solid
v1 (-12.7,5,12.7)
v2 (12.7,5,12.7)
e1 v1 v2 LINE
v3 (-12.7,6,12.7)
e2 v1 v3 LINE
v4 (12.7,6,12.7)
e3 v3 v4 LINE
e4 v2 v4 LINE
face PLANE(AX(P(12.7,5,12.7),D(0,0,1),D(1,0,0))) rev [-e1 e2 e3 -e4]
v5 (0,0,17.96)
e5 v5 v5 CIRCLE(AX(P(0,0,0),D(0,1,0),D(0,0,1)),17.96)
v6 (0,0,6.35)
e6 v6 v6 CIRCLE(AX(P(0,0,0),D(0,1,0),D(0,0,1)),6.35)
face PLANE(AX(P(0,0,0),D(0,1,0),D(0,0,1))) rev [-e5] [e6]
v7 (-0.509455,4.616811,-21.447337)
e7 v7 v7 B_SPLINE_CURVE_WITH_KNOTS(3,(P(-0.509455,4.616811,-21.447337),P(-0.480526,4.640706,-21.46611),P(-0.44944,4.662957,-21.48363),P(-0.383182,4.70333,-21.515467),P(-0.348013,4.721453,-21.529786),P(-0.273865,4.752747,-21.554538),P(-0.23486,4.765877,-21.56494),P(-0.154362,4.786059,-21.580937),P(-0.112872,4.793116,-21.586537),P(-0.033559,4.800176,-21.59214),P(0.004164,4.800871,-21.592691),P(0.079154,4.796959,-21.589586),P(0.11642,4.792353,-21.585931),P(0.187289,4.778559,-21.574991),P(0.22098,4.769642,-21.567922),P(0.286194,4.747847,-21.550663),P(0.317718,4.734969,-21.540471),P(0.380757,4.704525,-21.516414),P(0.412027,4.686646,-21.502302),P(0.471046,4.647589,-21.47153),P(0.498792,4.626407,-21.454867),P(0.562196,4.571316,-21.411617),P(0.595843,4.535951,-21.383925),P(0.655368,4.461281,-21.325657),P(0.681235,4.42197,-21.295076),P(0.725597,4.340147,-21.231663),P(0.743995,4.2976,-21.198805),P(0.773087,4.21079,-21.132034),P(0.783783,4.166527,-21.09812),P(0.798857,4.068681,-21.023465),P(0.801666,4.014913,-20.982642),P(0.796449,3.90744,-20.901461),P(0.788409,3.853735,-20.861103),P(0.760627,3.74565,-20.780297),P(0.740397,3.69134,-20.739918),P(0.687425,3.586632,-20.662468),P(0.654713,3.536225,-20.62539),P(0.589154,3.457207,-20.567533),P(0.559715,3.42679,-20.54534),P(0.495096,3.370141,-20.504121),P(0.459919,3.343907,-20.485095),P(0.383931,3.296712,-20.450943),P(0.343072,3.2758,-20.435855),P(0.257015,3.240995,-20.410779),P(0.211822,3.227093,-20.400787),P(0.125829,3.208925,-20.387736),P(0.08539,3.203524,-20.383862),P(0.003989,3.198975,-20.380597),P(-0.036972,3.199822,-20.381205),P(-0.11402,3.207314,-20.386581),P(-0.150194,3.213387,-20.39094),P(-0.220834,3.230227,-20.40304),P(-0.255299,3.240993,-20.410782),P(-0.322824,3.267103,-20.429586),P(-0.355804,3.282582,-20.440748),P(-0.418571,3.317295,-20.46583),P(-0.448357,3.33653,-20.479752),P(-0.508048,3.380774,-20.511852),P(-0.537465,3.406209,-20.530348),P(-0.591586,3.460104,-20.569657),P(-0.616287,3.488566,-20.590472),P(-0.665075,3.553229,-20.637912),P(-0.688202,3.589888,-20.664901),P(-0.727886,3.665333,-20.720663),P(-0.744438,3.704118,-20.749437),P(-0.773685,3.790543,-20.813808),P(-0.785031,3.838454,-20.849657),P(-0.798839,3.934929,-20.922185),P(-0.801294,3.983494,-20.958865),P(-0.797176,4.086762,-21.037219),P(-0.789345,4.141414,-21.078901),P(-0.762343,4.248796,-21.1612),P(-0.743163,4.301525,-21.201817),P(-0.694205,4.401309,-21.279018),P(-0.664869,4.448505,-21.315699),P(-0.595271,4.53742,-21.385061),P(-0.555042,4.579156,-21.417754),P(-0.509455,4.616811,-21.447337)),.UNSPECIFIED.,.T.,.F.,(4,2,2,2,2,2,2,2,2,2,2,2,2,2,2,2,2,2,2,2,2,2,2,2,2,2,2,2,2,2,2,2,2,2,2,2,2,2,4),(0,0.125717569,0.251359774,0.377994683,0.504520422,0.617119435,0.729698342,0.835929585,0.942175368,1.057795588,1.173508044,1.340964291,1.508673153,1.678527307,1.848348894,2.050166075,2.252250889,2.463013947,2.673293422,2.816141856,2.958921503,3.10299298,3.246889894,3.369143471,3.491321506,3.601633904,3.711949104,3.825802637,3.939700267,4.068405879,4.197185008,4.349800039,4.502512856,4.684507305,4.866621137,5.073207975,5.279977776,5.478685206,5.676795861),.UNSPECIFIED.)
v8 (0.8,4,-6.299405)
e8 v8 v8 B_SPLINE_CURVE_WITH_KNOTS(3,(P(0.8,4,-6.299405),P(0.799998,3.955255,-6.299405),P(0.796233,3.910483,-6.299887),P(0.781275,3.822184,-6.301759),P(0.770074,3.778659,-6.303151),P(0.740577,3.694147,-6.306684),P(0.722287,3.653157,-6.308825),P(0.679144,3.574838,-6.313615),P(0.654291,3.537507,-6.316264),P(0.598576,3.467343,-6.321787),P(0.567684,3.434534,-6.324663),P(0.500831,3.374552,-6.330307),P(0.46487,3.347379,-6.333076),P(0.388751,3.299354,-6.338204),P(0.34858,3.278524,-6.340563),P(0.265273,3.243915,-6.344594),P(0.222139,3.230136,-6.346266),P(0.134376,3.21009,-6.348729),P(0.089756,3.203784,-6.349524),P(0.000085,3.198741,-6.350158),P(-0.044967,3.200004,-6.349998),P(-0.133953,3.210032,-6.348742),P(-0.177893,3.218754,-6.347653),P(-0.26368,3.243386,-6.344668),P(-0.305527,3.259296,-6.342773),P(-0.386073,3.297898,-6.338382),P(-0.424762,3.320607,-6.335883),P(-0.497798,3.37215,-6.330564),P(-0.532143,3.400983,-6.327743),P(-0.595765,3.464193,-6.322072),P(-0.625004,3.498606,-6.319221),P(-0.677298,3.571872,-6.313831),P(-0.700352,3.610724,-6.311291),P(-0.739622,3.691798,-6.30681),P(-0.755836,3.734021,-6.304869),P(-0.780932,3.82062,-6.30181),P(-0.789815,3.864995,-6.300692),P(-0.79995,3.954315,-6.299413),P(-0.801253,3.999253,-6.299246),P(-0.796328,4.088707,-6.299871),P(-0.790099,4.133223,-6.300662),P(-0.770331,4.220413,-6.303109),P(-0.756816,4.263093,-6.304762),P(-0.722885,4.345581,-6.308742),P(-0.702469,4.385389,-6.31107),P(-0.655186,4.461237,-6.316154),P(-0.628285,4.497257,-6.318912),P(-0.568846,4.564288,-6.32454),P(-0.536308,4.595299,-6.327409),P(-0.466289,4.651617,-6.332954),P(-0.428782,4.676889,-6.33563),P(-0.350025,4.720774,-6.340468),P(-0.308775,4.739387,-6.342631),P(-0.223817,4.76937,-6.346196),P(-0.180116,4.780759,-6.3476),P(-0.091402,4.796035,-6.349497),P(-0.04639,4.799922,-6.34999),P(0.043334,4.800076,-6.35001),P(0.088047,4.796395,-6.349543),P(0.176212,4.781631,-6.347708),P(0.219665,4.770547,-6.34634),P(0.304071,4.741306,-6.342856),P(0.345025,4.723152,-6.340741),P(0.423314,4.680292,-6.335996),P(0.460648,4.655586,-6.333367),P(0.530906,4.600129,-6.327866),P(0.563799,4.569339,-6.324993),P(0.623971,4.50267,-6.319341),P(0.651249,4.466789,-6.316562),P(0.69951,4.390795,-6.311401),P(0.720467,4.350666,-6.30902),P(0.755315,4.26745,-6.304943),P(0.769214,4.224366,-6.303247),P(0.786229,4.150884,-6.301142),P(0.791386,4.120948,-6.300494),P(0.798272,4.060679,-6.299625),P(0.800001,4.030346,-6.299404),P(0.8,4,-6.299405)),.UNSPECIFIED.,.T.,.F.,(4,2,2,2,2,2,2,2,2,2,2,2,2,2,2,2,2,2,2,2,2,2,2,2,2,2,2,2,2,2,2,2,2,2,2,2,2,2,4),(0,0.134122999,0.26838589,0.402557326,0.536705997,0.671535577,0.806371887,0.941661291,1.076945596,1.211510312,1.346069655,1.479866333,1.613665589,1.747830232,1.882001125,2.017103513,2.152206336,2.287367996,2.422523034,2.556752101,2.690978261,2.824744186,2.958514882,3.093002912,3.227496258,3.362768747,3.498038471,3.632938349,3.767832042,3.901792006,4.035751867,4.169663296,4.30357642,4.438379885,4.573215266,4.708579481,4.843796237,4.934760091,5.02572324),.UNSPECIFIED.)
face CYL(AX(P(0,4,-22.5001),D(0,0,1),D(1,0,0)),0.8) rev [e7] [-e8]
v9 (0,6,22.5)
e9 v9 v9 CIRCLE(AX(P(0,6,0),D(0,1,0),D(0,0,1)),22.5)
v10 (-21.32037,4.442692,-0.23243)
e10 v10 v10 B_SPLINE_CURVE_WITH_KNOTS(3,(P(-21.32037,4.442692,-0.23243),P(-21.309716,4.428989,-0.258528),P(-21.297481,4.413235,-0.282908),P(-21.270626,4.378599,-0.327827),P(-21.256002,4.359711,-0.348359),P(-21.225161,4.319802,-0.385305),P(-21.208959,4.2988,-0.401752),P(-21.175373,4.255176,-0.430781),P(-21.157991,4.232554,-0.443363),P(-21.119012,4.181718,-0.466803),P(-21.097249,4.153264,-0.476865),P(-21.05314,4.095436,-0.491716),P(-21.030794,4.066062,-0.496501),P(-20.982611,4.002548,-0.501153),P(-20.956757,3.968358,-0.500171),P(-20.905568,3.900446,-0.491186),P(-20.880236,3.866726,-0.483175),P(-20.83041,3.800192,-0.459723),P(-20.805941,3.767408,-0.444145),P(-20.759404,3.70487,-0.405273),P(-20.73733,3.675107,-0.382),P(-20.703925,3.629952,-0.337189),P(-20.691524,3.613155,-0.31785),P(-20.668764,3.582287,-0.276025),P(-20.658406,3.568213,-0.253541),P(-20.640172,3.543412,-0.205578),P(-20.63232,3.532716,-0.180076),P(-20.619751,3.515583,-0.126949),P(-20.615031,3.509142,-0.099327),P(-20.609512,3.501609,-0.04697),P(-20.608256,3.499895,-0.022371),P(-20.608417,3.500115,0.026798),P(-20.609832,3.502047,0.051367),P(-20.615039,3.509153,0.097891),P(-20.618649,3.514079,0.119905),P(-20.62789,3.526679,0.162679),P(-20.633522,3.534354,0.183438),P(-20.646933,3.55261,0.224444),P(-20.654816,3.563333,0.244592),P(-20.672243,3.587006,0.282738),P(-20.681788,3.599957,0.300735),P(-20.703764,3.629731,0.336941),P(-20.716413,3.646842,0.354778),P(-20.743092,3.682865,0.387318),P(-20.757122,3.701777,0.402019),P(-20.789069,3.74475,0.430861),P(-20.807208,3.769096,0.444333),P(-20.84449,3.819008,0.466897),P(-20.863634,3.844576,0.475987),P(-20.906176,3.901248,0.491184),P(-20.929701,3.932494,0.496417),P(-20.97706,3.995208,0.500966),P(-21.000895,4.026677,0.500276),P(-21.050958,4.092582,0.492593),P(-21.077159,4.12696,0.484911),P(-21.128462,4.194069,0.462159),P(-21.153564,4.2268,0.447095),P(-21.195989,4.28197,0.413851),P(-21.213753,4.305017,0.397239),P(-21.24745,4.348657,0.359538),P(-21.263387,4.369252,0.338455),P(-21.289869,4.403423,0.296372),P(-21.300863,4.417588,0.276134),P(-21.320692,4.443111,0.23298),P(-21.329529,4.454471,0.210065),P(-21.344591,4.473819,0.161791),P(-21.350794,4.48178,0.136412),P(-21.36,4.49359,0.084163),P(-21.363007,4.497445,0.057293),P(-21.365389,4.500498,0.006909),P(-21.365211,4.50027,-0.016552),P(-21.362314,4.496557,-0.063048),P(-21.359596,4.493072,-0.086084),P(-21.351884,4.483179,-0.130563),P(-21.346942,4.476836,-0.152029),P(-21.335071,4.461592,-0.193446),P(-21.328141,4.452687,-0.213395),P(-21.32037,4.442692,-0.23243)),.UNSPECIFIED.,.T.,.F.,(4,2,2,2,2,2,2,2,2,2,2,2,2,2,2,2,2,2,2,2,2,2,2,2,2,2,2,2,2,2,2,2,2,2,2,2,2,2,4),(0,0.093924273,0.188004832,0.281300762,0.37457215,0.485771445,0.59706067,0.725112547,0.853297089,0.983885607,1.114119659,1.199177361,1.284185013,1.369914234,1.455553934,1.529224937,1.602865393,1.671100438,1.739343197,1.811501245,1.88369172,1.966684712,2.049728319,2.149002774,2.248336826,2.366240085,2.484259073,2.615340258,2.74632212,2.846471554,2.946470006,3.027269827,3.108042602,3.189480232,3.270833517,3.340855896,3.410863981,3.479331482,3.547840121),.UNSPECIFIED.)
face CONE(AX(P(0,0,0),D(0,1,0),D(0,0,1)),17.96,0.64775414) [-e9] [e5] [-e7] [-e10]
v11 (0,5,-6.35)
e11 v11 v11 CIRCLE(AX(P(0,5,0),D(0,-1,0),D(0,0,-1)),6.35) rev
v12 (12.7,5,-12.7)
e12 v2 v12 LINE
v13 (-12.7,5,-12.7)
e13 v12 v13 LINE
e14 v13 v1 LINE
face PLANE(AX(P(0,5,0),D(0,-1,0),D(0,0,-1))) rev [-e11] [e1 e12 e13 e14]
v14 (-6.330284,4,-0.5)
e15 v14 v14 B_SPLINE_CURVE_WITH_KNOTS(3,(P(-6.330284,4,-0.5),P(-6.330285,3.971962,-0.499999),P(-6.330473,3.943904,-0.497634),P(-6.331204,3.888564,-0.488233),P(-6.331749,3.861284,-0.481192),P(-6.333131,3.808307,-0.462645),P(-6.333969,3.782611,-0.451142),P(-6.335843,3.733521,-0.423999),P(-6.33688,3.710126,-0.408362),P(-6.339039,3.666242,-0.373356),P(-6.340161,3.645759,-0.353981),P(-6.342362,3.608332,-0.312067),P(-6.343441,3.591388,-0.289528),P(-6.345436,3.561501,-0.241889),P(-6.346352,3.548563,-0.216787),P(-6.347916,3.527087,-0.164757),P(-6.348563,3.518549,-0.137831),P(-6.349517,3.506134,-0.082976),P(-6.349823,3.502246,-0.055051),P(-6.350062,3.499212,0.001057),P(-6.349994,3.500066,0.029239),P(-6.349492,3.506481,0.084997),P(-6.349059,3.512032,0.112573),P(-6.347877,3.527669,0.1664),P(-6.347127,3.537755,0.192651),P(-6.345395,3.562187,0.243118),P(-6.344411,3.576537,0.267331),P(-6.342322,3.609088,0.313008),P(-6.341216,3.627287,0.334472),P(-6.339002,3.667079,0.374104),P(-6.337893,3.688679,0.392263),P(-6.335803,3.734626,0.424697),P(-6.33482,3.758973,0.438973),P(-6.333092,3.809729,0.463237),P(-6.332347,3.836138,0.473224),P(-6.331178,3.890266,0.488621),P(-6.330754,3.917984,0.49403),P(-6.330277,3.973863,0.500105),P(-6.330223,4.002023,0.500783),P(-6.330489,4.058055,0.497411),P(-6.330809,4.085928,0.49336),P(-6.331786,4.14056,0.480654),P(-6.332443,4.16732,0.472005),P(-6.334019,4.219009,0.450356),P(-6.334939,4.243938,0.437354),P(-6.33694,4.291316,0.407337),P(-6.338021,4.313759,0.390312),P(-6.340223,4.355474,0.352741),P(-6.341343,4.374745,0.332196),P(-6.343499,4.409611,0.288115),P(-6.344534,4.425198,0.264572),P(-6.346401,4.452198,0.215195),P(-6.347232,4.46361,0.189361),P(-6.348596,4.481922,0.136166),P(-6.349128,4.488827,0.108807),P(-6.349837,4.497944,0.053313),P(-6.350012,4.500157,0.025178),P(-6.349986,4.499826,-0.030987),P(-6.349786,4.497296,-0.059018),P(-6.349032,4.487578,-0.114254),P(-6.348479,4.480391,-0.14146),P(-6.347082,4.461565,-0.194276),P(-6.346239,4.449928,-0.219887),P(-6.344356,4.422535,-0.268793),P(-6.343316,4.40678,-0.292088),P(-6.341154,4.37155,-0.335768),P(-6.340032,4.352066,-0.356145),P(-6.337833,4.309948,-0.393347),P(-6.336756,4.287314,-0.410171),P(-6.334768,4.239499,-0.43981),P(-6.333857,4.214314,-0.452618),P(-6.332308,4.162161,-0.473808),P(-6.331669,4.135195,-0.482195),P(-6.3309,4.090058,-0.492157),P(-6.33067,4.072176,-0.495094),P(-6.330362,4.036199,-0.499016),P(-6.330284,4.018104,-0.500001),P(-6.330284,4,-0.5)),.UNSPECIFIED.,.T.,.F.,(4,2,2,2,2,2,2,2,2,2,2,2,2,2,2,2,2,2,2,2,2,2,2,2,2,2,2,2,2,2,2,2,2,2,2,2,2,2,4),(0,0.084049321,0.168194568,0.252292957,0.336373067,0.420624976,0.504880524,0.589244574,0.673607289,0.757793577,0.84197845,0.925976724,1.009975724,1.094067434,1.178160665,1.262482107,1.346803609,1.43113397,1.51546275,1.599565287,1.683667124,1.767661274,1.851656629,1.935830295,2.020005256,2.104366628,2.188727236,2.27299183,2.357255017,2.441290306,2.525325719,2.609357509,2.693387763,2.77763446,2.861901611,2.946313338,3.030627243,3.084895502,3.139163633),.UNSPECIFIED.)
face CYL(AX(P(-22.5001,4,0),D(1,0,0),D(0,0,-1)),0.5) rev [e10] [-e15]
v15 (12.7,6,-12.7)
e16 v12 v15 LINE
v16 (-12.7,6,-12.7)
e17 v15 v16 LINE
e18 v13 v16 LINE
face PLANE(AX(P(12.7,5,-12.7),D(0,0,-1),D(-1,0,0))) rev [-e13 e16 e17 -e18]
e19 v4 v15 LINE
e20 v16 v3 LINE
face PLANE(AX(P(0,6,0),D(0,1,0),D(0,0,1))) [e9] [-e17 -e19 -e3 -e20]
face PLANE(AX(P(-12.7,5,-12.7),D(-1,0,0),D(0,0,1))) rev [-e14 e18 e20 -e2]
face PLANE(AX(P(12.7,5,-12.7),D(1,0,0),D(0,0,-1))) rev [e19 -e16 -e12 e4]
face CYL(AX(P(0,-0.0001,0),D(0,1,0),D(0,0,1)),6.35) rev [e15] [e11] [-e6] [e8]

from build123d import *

# Parameters (mm, degrees)
SKETCH5_R          = 6.35
CUT_EXTRUDE1_DEPTH = 33.380549717
SKETCH7_W          = 25.4
SKETCH7_H          = 25.4
CUT_EXTRUDE2_DEPTH = 1
SKETCH8_R          = 0.8
CUT_EXTRUDE3_DEPTH = 33.380549717
SKETCH9_R          = 0.5
CUT_EXTRUDE4_DEPTH = 33.380549875


# Read off the part's stored shape, not the designer's step: Loft1
with BuildPart() as part:
    # Loft1 outline → Loft1 (revolve)
    with BuildSketch(Plane.XY):
        Polygon((0, 0), (17.96, 0), (22.5, 6), (0, 6), align=None)
    revolve(axis=Axis((0, 0, 0), (0, 1, 0)))

    # Sketch5 → Cut-Extrude1 (cut, through all)
    with BuildSketch(Plane(origin=(0, 6, 0), x_dir=(1, 0, 0), z_dir=(0, 1, 0))):
        with Locations(Location((0, 0, 0), (0, 0, 270))):
            Circle(SKETCH5_R)
    extrude(amount=-CUT_EXTRUDE1_DEPTH, mode=Mode.SUBTRACT)

    # Sketch7 → Cut-Extrude2 (cut)
    with BuildSketch(Plane(origin=(0, 6, 0), x_dir=(1, 0, 0), z_dir=(0, 1, 0))):
        Rectangle(SKETCH7_W, SKETCH7_H)
    extrude(amount=-CUT_EXTRUDE2_DEPTH, mode=Mode.SUBTRACT)

    # Sketch8 → Cut-Extrude3 (cut, through all)
    with BuildSketch(Plane.XY):
        with Locations((0, 4)):
            Circle(SKETCH8_R)
    extrude(amount=-CUT_EXTRUDE3_DEPTH, mode=Mode.SUBTRACT)

    # Sketch9 → Cut-Extrude4 (cut, through all)
    with BuildSketch(Plane(origin=(0, 0, 0), x_dir=(0, 0, -1), z_dir=(1, 0, 0))):
        with Locations((0, 4)):
            Circle(SKETCH9_R)
    extrude(amount=-CUT_EXTRUDE4_DEPTH, mode=Mode.SUBTRACT)


solid = part.part
